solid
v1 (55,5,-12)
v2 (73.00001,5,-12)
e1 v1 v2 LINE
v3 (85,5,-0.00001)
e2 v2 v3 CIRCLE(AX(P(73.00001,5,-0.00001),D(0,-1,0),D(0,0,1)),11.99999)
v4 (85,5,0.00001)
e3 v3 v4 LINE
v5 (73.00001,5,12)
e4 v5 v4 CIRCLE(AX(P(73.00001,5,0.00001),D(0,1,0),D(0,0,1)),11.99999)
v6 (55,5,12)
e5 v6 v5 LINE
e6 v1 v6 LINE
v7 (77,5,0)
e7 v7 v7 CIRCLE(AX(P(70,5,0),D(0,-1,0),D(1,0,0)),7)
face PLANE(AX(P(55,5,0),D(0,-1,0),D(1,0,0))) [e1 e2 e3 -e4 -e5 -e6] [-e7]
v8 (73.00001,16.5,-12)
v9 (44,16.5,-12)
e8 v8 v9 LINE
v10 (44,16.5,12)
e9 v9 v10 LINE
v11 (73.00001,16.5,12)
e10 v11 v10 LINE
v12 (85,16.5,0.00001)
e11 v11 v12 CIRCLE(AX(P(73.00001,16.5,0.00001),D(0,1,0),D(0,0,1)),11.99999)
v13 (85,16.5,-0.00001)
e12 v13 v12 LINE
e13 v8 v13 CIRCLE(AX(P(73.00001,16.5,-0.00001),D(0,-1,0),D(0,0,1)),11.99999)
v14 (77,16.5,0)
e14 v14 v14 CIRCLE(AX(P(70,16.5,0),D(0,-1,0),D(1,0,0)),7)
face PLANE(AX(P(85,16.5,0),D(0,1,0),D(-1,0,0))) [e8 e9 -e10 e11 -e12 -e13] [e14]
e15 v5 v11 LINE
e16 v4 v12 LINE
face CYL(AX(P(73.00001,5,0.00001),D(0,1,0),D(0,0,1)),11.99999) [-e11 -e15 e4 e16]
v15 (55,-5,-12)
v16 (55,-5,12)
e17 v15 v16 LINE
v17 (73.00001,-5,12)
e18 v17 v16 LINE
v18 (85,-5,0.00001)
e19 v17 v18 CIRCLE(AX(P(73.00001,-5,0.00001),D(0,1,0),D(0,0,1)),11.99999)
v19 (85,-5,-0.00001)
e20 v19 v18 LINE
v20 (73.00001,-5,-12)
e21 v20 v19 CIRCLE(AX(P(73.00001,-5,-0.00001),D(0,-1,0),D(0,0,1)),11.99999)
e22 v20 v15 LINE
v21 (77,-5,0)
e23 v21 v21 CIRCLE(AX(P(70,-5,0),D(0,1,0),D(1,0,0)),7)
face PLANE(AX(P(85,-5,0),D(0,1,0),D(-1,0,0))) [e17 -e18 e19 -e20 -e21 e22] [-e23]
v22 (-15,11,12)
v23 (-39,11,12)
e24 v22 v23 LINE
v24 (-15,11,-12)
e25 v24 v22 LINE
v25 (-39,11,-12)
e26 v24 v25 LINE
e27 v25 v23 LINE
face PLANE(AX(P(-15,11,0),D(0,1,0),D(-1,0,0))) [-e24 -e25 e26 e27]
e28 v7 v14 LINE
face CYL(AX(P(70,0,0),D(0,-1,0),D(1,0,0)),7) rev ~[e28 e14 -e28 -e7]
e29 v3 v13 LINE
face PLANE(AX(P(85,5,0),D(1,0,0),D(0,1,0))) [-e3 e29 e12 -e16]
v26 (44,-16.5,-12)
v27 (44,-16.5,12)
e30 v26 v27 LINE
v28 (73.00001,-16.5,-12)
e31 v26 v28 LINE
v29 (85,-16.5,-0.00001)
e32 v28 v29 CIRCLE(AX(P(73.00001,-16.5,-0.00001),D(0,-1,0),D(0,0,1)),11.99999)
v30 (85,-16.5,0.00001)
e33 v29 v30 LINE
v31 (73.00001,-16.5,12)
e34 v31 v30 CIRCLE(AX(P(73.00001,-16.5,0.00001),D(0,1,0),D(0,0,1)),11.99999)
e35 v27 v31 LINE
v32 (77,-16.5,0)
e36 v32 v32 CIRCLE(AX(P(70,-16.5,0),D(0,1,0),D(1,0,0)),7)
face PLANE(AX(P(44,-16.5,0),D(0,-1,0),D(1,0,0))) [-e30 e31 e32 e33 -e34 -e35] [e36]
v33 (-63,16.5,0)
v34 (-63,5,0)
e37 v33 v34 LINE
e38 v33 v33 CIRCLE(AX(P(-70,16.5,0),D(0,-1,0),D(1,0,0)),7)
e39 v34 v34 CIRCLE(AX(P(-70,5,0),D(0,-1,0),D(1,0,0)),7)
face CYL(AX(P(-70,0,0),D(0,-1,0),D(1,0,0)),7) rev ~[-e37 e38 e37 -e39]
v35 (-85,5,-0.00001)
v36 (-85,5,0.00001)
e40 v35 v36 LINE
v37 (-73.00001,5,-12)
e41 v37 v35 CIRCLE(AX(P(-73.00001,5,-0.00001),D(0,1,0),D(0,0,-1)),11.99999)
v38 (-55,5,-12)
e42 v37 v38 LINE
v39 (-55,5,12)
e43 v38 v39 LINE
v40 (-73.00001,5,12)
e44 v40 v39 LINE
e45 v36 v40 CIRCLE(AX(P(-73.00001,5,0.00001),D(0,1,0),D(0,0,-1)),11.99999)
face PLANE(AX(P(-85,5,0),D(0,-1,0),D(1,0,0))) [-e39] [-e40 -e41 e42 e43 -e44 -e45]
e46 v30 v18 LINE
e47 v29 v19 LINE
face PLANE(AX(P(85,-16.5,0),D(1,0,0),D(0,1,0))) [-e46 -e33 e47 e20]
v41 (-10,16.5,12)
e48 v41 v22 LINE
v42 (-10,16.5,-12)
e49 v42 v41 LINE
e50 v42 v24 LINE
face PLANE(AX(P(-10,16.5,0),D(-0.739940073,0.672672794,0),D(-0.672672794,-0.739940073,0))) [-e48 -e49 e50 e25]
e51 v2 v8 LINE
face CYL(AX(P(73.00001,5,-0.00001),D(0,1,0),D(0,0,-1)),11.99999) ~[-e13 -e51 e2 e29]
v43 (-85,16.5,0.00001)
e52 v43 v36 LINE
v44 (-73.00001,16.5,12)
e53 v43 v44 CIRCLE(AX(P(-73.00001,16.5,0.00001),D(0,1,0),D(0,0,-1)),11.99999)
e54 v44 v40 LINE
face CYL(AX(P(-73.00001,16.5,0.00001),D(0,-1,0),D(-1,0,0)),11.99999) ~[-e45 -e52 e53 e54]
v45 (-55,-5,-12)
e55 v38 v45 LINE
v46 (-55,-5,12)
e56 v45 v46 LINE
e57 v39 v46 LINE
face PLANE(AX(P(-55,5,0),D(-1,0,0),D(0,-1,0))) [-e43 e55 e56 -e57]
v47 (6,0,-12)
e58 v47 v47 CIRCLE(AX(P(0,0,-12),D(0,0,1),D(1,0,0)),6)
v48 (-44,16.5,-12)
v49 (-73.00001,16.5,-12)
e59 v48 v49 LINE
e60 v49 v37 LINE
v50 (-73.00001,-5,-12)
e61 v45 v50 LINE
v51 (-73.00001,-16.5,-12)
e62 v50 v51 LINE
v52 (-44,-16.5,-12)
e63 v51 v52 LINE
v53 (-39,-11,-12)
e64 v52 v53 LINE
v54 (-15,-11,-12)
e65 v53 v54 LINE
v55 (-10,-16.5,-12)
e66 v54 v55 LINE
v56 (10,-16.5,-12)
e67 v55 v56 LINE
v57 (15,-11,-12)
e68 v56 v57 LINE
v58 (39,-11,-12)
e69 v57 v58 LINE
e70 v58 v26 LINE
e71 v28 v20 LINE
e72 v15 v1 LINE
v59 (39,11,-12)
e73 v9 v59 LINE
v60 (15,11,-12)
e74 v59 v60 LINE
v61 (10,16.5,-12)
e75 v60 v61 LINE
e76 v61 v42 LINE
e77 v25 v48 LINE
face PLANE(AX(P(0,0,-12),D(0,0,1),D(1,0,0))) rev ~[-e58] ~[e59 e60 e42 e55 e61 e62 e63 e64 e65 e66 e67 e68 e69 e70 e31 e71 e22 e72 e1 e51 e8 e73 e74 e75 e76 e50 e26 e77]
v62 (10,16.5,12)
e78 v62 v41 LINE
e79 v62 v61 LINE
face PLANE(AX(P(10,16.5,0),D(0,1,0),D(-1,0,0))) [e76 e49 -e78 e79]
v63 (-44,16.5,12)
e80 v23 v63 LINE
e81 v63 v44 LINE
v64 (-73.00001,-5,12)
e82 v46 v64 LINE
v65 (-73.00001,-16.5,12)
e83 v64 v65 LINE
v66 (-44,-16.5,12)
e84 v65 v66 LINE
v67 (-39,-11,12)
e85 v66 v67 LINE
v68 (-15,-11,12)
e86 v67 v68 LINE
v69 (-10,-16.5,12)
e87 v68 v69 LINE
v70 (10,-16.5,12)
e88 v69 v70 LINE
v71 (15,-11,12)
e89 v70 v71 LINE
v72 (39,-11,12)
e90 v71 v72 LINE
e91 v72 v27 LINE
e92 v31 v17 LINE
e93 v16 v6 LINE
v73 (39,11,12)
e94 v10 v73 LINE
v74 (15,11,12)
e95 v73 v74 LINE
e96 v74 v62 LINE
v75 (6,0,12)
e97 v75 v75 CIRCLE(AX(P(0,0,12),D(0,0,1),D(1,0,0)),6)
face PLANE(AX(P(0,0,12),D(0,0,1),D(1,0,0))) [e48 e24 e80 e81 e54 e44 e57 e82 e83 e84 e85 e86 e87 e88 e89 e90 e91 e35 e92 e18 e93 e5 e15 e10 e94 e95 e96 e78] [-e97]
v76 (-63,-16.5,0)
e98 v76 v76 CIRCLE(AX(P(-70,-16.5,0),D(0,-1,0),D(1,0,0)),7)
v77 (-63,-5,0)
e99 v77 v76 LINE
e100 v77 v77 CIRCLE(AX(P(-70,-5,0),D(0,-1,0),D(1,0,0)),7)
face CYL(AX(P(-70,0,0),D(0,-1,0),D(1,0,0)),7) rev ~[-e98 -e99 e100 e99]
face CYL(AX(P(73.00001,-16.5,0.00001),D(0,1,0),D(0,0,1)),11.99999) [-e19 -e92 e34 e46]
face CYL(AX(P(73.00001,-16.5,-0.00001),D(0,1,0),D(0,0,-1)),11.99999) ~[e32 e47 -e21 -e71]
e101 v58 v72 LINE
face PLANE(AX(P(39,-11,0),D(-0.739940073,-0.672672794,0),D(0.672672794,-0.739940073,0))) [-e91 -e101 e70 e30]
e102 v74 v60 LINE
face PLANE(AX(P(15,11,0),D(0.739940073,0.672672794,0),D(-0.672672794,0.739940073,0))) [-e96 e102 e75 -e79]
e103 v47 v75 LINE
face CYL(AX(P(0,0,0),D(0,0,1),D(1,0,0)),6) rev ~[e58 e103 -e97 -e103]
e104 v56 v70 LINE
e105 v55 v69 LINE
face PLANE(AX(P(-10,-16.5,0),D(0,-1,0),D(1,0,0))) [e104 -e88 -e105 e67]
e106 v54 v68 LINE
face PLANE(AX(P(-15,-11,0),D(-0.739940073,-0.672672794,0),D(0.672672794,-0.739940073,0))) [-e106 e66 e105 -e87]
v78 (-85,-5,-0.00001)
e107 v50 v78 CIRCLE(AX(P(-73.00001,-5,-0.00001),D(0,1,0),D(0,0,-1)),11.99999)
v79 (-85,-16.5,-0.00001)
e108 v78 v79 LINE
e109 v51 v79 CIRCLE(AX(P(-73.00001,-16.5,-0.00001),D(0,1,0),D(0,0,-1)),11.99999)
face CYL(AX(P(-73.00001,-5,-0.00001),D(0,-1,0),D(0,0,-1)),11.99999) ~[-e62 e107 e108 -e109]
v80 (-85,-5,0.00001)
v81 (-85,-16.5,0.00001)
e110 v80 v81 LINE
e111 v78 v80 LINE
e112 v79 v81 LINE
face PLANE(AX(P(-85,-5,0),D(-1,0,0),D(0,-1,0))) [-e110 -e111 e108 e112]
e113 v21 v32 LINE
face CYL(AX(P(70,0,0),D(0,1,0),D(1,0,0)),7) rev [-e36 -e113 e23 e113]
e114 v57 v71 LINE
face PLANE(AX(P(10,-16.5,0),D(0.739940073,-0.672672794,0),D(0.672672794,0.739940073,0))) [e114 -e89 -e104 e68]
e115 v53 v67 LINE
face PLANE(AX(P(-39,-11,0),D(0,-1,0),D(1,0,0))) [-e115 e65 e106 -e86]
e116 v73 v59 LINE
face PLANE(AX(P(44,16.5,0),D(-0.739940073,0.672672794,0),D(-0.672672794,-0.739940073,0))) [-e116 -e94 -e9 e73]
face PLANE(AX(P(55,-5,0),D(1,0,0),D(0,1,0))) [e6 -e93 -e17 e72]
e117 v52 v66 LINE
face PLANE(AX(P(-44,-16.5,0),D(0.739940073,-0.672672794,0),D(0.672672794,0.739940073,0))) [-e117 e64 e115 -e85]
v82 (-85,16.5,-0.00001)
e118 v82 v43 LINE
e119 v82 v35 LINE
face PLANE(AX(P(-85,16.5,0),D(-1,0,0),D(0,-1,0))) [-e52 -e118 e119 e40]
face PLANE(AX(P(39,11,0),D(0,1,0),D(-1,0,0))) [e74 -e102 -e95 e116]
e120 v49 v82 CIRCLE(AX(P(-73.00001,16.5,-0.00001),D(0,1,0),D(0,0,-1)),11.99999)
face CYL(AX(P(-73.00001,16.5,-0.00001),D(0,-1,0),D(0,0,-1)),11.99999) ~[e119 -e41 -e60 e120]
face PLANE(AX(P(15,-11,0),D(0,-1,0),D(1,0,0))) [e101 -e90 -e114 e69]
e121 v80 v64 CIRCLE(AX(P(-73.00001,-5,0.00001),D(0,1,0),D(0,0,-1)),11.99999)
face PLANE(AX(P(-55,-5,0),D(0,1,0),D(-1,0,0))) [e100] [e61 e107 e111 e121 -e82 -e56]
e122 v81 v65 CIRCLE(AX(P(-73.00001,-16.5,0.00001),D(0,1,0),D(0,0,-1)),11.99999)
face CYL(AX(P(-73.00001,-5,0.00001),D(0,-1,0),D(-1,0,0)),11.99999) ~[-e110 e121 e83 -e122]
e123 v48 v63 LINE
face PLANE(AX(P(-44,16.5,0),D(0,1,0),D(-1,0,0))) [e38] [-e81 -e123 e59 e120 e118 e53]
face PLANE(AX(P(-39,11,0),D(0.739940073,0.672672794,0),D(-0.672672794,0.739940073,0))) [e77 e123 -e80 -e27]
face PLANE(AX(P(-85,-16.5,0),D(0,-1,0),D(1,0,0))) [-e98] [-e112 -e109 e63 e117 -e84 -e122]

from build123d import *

# Parameters (mm, degrees)
F1_DEPTH = 12
F2_R     = 6
F3_DEPTH = 25
F4_R     = 7
F5_DEPTH = 50
F6_R     = 11.99999
F7_R     = 11.99999


# Not quite as in the source:
# - a fillet or chamfer is up to 0.001 mm smaller than in the source, because OpenCascade refuses the exact size


with BuildPart() as f1:
    # F0 (on Top) → F1 (new body, symmetric)
    with BuildSketch(Plane.XY):
        Polygon((10, 16.5), (0, 16.5), (-10, 16.5), (-15, 11), (-39, 11), (-44, 16.5), (-85, 16.5), (-85, 5), (-55, 5), (-55, 0), (-55, -5), (-85, -5), (-85, -16.5), (-44, -16.5), (-39, -11), (-15, -11), (-10, -16.5), (0, -16.5), (10, -16.5), (15, -11), (39, -11), (44, -16.5), (85, -16.5), (85, -5), (55, -5), (55, 0), (55, 5), (85, 5), (85, 16.5), (44, 16.5), (39, 11), (15, 11), align=None)
    extrude(amount=F1_DEPTH, both=True)

    # F2 (on Top) → F3 (cut, symmetric)
    with BuildSketch(Plane.XY):
        Circle(F2_R)
    extrude(amount=F3_DEPTH, both=True, mode=Mode.SUBTRACT)

    # F4 (on Front) → F5 (cut, symmetric)
    with BuildSketch(Plane.XZ):
        with Locations((70, 0)):
            Circle(F4_R)
        with Locations((-70, 0)):
            Circle(F4_R)
    extrude(amount=F5_DEPTH, both=True, mode=Mode.SUBTRACT)

    # F6 (radius 12 in the source; OpenCascade refuses exactly that, so slightly less here)
    f6_edges = [f1.edges().sort_by_distance(p)[0] for p in [
        (85, 10.75, 12),
        (85, -10.75, 12),
        (85, -10.75, -12),
        (85, 10.75, -12),
    ]]
    fillet(f6_edges, radius=F6_R)

    # F7 (radius 12 in the source; OpenCascade refuses exactly that, so slightly less here)
    f7_edges = [f1.edges().sort_by_distance(p)[0] for p in [
        (-85, -10.75, 12),
        (-85, 10.75, 12),
        (-85, 10.75, -12),
        (-85, -10.75, -12),
    ]]
    fillet(f7_edges, radius=F7_R)


solid = f1.part
